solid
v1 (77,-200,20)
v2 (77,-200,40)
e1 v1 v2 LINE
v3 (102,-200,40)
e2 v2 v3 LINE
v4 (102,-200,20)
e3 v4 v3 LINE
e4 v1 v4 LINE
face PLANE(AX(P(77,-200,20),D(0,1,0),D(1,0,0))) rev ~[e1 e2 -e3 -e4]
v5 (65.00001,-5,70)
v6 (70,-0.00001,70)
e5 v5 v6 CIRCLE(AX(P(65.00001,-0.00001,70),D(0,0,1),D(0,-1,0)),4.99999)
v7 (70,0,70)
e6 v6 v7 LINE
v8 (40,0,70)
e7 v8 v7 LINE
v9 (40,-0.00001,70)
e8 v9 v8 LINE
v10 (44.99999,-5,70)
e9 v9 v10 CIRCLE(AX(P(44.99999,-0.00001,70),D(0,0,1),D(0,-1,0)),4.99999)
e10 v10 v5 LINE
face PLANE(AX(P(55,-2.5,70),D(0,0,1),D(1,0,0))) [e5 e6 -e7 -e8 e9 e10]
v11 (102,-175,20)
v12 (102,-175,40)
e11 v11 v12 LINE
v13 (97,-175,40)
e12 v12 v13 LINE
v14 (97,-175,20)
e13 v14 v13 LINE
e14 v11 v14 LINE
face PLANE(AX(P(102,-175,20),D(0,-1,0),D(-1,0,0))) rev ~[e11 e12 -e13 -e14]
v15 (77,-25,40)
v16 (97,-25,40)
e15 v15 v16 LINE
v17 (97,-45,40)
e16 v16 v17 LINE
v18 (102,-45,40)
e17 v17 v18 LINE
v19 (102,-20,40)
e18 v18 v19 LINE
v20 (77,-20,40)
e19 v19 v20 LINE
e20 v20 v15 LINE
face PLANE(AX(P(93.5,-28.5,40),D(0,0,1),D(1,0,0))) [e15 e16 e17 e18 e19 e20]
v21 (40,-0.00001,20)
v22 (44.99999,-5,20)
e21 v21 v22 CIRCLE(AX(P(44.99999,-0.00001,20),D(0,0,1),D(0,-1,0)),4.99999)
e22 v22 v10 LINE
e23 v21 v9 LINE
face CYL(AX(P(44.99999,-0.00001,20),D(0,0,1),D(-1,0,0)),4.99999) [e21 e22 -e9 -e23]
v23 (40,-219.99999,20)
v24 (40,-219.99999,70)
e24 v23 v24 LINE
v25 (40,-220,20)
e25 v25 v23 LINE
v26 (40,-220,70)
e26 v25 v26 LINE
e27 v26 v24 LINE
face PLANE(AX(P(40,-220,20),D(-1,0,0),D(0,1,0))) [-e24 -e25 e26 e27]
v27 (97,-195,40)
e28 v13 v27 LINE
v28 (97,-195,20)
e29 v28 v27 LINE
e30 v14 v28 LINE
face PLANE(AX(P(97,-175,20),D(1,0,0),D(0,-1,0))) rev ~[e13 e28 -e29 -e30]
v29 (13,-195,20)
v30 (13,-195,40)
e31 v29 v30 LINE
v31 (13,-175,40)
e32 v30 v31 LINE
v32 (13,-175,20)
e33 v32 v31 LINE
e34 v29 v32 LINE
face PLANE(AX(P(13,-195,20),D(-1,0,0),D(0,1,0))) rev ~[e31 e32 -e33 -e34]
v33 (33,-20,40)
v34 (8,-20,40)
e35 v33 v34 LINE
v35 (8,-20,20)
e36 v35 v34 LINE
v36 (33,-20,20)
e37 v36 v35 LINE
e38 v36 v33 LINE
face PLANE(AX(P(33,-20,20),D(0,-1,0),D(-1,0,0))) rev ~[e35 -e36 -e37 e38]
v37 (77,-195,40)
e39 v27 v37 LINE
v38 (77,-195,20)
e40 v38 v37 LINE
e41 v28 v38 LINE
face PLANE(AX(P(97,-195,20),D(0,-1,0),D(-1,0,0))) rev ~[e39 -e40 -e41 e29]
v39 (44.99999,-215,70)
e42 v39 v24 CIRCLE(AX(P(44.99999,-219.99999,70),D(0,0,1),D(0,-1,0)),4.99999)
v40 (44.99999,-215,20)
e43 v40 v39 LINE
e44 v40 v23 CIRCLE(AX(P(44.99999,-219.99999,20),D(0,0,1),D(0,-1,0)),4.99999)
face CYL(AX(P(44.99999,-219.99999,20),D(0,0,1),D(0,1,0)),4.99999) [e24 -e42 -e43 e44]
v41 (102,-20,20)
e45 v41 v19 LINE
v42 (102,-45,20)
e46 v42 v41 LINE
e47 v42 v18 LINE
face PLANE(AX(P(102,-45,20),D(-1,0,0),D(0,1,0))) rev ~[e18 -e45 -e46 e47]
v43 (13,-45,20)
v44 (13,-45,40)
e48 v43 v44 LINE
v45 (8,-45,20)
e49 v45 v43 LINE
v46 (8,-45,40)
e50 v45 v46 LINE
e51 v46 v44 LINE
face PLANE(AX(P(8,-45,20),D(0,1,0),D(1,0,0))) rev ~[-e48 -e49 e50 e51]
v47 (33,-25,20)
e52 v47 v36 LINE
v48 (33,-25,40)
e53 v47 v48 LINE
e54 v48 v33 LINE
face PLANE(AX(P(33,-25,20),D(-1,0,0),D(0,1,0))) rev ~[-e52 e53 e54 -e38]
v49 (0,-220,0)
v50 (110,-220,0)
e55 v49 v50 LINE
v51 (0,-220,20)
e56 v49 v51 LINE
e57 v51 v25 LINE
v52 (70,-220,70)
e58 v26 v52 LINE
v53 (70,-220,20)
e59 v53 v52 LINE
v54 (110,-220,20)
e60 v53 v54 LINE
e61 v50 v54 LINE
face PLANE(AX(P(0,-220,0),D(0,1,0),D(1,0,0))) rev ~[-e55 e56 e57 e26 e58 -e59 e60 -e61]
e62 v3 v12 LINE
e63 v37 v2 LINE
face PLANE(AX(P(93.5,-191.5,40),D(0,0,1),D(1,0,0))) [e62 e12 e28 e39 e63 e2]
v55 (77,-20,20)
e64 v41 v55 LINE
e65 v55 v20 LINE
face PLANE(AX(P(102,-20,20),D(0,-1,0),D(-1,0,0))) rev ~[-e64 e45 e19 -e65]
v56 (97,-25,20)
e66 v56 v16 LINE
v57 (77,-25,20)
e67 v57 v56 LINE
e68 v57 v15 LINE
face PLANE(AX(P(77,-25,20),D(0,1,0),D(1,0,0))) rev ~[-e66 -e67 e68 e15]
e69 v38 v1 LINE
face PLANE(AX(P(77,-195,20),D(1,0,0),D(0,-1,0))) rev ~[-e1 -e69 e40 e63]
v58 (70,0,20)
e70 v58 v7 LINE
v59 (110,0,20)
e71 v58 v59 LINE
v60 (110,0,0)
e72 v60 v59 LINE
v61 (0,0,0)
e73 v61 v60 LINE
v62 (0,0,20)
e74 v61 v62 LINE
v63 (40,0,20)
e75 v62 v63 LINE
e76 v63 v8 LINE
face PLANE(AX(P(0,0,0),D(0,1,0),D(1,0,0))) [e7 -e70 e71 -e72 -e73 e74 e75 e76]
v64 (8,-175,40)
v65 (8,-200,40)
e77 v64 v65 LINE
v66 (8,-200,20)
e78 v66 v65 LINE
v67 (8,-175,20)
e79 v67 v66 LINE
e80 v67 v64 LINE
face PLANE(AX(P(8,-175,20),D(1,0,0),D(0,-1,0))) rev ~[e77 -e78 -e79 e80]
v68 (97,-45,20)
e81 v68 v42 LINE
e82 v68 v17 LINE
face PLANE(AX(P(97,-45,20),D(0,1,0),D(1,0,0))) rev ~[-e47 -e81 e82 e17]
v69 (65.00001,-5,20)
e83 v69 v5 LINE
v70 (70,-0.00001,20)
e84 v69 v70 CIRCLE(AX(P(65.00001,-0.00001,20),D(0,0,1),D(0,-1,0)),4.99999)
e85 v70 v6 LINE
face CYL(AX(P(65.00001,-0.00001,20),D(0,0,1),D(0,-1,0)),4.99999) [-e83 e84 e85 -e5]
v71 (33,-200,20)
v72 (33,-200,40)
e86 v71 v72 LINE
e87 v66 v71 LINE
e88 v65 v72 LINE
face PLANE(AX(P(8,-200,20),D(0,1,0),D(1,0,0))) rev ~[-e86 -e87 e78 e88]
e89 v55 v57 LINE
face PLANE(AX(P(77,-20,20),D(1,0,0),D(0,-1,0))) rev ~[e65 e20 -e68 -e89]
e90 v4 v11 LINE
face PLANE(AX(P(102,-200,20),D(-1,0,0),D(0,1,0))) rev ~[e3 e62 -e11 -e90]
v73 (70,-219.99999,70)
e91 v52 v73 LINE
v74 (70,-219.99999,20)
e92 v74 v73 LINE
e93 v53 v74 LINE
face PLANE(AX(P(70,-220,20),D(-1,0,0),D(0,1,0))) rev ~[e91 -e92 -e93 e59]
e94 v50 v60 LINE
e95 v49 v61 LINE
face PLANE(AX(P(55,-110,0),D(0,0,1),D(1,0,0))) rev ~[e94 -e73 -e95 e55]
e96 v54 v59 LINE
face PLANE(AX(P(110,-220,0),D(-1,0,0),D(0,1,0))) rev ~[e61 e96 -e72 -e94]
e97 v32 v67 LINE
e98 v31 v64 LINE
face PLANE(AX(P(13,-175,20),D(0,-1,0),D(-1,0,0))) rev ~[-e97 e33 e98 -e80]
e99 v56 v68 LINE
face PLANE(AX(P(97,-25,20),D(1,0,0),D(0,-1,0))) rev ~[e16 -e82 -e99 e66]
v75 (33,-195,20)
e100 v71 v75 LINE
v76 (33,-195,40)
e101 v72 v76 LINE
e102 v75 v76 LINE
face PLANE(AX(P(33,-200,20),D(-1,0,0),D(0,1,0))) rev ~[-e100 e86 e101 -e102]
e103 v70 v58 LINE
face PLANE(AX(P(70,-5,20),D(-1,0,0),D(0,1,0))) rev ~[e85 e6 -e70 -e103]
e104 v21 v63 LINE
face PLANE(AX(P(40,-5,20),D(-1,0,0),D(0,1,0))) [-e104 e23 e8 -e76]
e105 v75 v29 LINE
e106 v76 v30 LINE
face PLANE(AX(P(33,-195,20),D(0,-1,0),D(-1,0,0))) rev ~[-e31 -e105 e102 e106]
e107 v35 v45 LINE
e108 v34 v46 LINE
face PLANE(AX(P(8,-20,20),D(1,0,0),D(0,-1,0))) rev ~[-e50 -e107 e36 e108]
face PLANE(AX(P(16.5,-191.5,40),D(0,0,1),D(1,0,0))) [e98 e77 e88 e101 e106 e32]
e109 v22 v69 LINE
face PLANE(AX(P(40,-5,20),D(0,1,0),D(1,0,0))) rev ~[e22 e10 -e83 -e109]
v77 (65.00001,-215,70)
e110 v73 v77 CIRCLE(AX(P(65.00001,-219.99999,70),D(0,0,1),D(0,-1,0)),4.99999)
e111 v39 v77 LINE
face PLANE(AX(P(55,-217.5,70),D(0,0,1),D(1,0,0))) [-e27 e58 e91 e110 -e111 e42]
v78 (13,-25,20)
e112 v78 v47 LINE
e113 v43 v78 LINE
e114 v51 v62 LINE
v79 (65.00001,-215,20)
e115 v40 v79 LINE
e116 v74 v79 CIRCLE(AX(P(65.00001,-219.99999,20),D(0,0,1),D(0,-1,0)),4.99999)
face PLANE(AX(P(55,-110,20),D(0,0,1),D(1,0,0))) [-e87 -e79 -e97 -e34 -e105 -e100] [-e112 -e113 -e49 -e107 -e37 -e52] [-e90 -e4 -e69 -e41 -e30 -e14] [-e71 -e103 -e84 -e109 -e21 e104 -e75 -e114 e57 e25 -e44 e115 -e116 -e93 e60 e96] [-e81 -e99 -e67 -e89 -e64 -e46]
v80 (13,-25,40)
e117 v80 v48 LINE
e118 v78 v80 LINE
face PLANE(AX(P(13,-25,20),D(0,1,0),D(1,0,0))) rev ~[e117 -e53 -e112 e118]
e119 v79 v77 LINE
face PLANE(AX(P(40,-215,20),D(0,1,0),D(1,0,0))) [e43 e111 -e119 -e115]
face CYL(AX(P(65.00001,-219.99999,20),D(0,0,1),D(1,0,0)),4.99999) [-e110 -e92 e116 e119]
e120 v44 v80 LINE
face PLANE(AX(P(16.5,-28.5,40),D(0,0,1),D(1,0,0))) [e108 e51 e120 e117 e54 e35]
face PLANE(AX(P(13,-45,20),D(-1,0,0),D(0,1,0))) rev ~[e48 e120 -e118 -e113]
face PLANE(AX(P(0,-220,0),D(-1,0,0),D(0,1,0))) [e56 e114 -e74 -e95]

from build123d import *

# Parameters (mm, degrees)
F0_W     = 110
F0_H     = 220
F1_DEPTH = 20
F3_DEPTH = 20
F4_W     = 30
F4_H     = 5
F5_DEPTH = 50
F6_R     = 4.99999


# Not quite as in the source:
# - a fillet or chamfer is up to 0.001 mm smaller than in the source, because OpenCascade refuses the exact size


with BuildPart() as f1:
    # F0 (on Top) → F1 (new body)
    with BuildSketch(Plane.XY):
        with Locations((55, -110)):
            Rectangle(F0_W, F0_H)
    extrude(amount=F1_DEPTH)

    # F2 (on face) → F3 (join)
    with BuildSketch(Plane.XY.offset(20)):
        Polygon((8, -20), (8, -45), (13, -45), (13, -25), (33, -25), (33, -20), align=None)
        Polygon((77, -20), (77, -25), (97, -25), (97, -45), (102, -45), (102, -20), align=None)
        Polygon((33, -200), (33, -195), (13, -195), (13, -175), (8, -175), (8, -200), align=None)
        Polygon((97, -175), (97, -195), (77, -195), (77, -200), (102, -200), (102, -175), align=None)
    extrude(amount=F3_DEPTH)

    # F4 (on face) → F5 (join)
    with BuildSketch(Plane.XY.offset(20)):
        with Locations((55, -2.5)):
            Rectangle(F4_W, F4_H)
        with Locations((55, -217.5)):
            Rectangle(F4_W, F4_H)
    extrude(amount=F5_DEPTH)

    # F6 (radius 5 in the source; OpenCascade refuses exactly that, so slightly less here)
    f6_edges = [f1.edges().sort_by_distance(p)[0] for p in [
        (40, -5, 45),
        (70, -5, 45),
        (40, -215, 45),
        (70, -215, 45),
    ]]
    fillet(f6_edges, radius=F6_R)


solid = f1.part
